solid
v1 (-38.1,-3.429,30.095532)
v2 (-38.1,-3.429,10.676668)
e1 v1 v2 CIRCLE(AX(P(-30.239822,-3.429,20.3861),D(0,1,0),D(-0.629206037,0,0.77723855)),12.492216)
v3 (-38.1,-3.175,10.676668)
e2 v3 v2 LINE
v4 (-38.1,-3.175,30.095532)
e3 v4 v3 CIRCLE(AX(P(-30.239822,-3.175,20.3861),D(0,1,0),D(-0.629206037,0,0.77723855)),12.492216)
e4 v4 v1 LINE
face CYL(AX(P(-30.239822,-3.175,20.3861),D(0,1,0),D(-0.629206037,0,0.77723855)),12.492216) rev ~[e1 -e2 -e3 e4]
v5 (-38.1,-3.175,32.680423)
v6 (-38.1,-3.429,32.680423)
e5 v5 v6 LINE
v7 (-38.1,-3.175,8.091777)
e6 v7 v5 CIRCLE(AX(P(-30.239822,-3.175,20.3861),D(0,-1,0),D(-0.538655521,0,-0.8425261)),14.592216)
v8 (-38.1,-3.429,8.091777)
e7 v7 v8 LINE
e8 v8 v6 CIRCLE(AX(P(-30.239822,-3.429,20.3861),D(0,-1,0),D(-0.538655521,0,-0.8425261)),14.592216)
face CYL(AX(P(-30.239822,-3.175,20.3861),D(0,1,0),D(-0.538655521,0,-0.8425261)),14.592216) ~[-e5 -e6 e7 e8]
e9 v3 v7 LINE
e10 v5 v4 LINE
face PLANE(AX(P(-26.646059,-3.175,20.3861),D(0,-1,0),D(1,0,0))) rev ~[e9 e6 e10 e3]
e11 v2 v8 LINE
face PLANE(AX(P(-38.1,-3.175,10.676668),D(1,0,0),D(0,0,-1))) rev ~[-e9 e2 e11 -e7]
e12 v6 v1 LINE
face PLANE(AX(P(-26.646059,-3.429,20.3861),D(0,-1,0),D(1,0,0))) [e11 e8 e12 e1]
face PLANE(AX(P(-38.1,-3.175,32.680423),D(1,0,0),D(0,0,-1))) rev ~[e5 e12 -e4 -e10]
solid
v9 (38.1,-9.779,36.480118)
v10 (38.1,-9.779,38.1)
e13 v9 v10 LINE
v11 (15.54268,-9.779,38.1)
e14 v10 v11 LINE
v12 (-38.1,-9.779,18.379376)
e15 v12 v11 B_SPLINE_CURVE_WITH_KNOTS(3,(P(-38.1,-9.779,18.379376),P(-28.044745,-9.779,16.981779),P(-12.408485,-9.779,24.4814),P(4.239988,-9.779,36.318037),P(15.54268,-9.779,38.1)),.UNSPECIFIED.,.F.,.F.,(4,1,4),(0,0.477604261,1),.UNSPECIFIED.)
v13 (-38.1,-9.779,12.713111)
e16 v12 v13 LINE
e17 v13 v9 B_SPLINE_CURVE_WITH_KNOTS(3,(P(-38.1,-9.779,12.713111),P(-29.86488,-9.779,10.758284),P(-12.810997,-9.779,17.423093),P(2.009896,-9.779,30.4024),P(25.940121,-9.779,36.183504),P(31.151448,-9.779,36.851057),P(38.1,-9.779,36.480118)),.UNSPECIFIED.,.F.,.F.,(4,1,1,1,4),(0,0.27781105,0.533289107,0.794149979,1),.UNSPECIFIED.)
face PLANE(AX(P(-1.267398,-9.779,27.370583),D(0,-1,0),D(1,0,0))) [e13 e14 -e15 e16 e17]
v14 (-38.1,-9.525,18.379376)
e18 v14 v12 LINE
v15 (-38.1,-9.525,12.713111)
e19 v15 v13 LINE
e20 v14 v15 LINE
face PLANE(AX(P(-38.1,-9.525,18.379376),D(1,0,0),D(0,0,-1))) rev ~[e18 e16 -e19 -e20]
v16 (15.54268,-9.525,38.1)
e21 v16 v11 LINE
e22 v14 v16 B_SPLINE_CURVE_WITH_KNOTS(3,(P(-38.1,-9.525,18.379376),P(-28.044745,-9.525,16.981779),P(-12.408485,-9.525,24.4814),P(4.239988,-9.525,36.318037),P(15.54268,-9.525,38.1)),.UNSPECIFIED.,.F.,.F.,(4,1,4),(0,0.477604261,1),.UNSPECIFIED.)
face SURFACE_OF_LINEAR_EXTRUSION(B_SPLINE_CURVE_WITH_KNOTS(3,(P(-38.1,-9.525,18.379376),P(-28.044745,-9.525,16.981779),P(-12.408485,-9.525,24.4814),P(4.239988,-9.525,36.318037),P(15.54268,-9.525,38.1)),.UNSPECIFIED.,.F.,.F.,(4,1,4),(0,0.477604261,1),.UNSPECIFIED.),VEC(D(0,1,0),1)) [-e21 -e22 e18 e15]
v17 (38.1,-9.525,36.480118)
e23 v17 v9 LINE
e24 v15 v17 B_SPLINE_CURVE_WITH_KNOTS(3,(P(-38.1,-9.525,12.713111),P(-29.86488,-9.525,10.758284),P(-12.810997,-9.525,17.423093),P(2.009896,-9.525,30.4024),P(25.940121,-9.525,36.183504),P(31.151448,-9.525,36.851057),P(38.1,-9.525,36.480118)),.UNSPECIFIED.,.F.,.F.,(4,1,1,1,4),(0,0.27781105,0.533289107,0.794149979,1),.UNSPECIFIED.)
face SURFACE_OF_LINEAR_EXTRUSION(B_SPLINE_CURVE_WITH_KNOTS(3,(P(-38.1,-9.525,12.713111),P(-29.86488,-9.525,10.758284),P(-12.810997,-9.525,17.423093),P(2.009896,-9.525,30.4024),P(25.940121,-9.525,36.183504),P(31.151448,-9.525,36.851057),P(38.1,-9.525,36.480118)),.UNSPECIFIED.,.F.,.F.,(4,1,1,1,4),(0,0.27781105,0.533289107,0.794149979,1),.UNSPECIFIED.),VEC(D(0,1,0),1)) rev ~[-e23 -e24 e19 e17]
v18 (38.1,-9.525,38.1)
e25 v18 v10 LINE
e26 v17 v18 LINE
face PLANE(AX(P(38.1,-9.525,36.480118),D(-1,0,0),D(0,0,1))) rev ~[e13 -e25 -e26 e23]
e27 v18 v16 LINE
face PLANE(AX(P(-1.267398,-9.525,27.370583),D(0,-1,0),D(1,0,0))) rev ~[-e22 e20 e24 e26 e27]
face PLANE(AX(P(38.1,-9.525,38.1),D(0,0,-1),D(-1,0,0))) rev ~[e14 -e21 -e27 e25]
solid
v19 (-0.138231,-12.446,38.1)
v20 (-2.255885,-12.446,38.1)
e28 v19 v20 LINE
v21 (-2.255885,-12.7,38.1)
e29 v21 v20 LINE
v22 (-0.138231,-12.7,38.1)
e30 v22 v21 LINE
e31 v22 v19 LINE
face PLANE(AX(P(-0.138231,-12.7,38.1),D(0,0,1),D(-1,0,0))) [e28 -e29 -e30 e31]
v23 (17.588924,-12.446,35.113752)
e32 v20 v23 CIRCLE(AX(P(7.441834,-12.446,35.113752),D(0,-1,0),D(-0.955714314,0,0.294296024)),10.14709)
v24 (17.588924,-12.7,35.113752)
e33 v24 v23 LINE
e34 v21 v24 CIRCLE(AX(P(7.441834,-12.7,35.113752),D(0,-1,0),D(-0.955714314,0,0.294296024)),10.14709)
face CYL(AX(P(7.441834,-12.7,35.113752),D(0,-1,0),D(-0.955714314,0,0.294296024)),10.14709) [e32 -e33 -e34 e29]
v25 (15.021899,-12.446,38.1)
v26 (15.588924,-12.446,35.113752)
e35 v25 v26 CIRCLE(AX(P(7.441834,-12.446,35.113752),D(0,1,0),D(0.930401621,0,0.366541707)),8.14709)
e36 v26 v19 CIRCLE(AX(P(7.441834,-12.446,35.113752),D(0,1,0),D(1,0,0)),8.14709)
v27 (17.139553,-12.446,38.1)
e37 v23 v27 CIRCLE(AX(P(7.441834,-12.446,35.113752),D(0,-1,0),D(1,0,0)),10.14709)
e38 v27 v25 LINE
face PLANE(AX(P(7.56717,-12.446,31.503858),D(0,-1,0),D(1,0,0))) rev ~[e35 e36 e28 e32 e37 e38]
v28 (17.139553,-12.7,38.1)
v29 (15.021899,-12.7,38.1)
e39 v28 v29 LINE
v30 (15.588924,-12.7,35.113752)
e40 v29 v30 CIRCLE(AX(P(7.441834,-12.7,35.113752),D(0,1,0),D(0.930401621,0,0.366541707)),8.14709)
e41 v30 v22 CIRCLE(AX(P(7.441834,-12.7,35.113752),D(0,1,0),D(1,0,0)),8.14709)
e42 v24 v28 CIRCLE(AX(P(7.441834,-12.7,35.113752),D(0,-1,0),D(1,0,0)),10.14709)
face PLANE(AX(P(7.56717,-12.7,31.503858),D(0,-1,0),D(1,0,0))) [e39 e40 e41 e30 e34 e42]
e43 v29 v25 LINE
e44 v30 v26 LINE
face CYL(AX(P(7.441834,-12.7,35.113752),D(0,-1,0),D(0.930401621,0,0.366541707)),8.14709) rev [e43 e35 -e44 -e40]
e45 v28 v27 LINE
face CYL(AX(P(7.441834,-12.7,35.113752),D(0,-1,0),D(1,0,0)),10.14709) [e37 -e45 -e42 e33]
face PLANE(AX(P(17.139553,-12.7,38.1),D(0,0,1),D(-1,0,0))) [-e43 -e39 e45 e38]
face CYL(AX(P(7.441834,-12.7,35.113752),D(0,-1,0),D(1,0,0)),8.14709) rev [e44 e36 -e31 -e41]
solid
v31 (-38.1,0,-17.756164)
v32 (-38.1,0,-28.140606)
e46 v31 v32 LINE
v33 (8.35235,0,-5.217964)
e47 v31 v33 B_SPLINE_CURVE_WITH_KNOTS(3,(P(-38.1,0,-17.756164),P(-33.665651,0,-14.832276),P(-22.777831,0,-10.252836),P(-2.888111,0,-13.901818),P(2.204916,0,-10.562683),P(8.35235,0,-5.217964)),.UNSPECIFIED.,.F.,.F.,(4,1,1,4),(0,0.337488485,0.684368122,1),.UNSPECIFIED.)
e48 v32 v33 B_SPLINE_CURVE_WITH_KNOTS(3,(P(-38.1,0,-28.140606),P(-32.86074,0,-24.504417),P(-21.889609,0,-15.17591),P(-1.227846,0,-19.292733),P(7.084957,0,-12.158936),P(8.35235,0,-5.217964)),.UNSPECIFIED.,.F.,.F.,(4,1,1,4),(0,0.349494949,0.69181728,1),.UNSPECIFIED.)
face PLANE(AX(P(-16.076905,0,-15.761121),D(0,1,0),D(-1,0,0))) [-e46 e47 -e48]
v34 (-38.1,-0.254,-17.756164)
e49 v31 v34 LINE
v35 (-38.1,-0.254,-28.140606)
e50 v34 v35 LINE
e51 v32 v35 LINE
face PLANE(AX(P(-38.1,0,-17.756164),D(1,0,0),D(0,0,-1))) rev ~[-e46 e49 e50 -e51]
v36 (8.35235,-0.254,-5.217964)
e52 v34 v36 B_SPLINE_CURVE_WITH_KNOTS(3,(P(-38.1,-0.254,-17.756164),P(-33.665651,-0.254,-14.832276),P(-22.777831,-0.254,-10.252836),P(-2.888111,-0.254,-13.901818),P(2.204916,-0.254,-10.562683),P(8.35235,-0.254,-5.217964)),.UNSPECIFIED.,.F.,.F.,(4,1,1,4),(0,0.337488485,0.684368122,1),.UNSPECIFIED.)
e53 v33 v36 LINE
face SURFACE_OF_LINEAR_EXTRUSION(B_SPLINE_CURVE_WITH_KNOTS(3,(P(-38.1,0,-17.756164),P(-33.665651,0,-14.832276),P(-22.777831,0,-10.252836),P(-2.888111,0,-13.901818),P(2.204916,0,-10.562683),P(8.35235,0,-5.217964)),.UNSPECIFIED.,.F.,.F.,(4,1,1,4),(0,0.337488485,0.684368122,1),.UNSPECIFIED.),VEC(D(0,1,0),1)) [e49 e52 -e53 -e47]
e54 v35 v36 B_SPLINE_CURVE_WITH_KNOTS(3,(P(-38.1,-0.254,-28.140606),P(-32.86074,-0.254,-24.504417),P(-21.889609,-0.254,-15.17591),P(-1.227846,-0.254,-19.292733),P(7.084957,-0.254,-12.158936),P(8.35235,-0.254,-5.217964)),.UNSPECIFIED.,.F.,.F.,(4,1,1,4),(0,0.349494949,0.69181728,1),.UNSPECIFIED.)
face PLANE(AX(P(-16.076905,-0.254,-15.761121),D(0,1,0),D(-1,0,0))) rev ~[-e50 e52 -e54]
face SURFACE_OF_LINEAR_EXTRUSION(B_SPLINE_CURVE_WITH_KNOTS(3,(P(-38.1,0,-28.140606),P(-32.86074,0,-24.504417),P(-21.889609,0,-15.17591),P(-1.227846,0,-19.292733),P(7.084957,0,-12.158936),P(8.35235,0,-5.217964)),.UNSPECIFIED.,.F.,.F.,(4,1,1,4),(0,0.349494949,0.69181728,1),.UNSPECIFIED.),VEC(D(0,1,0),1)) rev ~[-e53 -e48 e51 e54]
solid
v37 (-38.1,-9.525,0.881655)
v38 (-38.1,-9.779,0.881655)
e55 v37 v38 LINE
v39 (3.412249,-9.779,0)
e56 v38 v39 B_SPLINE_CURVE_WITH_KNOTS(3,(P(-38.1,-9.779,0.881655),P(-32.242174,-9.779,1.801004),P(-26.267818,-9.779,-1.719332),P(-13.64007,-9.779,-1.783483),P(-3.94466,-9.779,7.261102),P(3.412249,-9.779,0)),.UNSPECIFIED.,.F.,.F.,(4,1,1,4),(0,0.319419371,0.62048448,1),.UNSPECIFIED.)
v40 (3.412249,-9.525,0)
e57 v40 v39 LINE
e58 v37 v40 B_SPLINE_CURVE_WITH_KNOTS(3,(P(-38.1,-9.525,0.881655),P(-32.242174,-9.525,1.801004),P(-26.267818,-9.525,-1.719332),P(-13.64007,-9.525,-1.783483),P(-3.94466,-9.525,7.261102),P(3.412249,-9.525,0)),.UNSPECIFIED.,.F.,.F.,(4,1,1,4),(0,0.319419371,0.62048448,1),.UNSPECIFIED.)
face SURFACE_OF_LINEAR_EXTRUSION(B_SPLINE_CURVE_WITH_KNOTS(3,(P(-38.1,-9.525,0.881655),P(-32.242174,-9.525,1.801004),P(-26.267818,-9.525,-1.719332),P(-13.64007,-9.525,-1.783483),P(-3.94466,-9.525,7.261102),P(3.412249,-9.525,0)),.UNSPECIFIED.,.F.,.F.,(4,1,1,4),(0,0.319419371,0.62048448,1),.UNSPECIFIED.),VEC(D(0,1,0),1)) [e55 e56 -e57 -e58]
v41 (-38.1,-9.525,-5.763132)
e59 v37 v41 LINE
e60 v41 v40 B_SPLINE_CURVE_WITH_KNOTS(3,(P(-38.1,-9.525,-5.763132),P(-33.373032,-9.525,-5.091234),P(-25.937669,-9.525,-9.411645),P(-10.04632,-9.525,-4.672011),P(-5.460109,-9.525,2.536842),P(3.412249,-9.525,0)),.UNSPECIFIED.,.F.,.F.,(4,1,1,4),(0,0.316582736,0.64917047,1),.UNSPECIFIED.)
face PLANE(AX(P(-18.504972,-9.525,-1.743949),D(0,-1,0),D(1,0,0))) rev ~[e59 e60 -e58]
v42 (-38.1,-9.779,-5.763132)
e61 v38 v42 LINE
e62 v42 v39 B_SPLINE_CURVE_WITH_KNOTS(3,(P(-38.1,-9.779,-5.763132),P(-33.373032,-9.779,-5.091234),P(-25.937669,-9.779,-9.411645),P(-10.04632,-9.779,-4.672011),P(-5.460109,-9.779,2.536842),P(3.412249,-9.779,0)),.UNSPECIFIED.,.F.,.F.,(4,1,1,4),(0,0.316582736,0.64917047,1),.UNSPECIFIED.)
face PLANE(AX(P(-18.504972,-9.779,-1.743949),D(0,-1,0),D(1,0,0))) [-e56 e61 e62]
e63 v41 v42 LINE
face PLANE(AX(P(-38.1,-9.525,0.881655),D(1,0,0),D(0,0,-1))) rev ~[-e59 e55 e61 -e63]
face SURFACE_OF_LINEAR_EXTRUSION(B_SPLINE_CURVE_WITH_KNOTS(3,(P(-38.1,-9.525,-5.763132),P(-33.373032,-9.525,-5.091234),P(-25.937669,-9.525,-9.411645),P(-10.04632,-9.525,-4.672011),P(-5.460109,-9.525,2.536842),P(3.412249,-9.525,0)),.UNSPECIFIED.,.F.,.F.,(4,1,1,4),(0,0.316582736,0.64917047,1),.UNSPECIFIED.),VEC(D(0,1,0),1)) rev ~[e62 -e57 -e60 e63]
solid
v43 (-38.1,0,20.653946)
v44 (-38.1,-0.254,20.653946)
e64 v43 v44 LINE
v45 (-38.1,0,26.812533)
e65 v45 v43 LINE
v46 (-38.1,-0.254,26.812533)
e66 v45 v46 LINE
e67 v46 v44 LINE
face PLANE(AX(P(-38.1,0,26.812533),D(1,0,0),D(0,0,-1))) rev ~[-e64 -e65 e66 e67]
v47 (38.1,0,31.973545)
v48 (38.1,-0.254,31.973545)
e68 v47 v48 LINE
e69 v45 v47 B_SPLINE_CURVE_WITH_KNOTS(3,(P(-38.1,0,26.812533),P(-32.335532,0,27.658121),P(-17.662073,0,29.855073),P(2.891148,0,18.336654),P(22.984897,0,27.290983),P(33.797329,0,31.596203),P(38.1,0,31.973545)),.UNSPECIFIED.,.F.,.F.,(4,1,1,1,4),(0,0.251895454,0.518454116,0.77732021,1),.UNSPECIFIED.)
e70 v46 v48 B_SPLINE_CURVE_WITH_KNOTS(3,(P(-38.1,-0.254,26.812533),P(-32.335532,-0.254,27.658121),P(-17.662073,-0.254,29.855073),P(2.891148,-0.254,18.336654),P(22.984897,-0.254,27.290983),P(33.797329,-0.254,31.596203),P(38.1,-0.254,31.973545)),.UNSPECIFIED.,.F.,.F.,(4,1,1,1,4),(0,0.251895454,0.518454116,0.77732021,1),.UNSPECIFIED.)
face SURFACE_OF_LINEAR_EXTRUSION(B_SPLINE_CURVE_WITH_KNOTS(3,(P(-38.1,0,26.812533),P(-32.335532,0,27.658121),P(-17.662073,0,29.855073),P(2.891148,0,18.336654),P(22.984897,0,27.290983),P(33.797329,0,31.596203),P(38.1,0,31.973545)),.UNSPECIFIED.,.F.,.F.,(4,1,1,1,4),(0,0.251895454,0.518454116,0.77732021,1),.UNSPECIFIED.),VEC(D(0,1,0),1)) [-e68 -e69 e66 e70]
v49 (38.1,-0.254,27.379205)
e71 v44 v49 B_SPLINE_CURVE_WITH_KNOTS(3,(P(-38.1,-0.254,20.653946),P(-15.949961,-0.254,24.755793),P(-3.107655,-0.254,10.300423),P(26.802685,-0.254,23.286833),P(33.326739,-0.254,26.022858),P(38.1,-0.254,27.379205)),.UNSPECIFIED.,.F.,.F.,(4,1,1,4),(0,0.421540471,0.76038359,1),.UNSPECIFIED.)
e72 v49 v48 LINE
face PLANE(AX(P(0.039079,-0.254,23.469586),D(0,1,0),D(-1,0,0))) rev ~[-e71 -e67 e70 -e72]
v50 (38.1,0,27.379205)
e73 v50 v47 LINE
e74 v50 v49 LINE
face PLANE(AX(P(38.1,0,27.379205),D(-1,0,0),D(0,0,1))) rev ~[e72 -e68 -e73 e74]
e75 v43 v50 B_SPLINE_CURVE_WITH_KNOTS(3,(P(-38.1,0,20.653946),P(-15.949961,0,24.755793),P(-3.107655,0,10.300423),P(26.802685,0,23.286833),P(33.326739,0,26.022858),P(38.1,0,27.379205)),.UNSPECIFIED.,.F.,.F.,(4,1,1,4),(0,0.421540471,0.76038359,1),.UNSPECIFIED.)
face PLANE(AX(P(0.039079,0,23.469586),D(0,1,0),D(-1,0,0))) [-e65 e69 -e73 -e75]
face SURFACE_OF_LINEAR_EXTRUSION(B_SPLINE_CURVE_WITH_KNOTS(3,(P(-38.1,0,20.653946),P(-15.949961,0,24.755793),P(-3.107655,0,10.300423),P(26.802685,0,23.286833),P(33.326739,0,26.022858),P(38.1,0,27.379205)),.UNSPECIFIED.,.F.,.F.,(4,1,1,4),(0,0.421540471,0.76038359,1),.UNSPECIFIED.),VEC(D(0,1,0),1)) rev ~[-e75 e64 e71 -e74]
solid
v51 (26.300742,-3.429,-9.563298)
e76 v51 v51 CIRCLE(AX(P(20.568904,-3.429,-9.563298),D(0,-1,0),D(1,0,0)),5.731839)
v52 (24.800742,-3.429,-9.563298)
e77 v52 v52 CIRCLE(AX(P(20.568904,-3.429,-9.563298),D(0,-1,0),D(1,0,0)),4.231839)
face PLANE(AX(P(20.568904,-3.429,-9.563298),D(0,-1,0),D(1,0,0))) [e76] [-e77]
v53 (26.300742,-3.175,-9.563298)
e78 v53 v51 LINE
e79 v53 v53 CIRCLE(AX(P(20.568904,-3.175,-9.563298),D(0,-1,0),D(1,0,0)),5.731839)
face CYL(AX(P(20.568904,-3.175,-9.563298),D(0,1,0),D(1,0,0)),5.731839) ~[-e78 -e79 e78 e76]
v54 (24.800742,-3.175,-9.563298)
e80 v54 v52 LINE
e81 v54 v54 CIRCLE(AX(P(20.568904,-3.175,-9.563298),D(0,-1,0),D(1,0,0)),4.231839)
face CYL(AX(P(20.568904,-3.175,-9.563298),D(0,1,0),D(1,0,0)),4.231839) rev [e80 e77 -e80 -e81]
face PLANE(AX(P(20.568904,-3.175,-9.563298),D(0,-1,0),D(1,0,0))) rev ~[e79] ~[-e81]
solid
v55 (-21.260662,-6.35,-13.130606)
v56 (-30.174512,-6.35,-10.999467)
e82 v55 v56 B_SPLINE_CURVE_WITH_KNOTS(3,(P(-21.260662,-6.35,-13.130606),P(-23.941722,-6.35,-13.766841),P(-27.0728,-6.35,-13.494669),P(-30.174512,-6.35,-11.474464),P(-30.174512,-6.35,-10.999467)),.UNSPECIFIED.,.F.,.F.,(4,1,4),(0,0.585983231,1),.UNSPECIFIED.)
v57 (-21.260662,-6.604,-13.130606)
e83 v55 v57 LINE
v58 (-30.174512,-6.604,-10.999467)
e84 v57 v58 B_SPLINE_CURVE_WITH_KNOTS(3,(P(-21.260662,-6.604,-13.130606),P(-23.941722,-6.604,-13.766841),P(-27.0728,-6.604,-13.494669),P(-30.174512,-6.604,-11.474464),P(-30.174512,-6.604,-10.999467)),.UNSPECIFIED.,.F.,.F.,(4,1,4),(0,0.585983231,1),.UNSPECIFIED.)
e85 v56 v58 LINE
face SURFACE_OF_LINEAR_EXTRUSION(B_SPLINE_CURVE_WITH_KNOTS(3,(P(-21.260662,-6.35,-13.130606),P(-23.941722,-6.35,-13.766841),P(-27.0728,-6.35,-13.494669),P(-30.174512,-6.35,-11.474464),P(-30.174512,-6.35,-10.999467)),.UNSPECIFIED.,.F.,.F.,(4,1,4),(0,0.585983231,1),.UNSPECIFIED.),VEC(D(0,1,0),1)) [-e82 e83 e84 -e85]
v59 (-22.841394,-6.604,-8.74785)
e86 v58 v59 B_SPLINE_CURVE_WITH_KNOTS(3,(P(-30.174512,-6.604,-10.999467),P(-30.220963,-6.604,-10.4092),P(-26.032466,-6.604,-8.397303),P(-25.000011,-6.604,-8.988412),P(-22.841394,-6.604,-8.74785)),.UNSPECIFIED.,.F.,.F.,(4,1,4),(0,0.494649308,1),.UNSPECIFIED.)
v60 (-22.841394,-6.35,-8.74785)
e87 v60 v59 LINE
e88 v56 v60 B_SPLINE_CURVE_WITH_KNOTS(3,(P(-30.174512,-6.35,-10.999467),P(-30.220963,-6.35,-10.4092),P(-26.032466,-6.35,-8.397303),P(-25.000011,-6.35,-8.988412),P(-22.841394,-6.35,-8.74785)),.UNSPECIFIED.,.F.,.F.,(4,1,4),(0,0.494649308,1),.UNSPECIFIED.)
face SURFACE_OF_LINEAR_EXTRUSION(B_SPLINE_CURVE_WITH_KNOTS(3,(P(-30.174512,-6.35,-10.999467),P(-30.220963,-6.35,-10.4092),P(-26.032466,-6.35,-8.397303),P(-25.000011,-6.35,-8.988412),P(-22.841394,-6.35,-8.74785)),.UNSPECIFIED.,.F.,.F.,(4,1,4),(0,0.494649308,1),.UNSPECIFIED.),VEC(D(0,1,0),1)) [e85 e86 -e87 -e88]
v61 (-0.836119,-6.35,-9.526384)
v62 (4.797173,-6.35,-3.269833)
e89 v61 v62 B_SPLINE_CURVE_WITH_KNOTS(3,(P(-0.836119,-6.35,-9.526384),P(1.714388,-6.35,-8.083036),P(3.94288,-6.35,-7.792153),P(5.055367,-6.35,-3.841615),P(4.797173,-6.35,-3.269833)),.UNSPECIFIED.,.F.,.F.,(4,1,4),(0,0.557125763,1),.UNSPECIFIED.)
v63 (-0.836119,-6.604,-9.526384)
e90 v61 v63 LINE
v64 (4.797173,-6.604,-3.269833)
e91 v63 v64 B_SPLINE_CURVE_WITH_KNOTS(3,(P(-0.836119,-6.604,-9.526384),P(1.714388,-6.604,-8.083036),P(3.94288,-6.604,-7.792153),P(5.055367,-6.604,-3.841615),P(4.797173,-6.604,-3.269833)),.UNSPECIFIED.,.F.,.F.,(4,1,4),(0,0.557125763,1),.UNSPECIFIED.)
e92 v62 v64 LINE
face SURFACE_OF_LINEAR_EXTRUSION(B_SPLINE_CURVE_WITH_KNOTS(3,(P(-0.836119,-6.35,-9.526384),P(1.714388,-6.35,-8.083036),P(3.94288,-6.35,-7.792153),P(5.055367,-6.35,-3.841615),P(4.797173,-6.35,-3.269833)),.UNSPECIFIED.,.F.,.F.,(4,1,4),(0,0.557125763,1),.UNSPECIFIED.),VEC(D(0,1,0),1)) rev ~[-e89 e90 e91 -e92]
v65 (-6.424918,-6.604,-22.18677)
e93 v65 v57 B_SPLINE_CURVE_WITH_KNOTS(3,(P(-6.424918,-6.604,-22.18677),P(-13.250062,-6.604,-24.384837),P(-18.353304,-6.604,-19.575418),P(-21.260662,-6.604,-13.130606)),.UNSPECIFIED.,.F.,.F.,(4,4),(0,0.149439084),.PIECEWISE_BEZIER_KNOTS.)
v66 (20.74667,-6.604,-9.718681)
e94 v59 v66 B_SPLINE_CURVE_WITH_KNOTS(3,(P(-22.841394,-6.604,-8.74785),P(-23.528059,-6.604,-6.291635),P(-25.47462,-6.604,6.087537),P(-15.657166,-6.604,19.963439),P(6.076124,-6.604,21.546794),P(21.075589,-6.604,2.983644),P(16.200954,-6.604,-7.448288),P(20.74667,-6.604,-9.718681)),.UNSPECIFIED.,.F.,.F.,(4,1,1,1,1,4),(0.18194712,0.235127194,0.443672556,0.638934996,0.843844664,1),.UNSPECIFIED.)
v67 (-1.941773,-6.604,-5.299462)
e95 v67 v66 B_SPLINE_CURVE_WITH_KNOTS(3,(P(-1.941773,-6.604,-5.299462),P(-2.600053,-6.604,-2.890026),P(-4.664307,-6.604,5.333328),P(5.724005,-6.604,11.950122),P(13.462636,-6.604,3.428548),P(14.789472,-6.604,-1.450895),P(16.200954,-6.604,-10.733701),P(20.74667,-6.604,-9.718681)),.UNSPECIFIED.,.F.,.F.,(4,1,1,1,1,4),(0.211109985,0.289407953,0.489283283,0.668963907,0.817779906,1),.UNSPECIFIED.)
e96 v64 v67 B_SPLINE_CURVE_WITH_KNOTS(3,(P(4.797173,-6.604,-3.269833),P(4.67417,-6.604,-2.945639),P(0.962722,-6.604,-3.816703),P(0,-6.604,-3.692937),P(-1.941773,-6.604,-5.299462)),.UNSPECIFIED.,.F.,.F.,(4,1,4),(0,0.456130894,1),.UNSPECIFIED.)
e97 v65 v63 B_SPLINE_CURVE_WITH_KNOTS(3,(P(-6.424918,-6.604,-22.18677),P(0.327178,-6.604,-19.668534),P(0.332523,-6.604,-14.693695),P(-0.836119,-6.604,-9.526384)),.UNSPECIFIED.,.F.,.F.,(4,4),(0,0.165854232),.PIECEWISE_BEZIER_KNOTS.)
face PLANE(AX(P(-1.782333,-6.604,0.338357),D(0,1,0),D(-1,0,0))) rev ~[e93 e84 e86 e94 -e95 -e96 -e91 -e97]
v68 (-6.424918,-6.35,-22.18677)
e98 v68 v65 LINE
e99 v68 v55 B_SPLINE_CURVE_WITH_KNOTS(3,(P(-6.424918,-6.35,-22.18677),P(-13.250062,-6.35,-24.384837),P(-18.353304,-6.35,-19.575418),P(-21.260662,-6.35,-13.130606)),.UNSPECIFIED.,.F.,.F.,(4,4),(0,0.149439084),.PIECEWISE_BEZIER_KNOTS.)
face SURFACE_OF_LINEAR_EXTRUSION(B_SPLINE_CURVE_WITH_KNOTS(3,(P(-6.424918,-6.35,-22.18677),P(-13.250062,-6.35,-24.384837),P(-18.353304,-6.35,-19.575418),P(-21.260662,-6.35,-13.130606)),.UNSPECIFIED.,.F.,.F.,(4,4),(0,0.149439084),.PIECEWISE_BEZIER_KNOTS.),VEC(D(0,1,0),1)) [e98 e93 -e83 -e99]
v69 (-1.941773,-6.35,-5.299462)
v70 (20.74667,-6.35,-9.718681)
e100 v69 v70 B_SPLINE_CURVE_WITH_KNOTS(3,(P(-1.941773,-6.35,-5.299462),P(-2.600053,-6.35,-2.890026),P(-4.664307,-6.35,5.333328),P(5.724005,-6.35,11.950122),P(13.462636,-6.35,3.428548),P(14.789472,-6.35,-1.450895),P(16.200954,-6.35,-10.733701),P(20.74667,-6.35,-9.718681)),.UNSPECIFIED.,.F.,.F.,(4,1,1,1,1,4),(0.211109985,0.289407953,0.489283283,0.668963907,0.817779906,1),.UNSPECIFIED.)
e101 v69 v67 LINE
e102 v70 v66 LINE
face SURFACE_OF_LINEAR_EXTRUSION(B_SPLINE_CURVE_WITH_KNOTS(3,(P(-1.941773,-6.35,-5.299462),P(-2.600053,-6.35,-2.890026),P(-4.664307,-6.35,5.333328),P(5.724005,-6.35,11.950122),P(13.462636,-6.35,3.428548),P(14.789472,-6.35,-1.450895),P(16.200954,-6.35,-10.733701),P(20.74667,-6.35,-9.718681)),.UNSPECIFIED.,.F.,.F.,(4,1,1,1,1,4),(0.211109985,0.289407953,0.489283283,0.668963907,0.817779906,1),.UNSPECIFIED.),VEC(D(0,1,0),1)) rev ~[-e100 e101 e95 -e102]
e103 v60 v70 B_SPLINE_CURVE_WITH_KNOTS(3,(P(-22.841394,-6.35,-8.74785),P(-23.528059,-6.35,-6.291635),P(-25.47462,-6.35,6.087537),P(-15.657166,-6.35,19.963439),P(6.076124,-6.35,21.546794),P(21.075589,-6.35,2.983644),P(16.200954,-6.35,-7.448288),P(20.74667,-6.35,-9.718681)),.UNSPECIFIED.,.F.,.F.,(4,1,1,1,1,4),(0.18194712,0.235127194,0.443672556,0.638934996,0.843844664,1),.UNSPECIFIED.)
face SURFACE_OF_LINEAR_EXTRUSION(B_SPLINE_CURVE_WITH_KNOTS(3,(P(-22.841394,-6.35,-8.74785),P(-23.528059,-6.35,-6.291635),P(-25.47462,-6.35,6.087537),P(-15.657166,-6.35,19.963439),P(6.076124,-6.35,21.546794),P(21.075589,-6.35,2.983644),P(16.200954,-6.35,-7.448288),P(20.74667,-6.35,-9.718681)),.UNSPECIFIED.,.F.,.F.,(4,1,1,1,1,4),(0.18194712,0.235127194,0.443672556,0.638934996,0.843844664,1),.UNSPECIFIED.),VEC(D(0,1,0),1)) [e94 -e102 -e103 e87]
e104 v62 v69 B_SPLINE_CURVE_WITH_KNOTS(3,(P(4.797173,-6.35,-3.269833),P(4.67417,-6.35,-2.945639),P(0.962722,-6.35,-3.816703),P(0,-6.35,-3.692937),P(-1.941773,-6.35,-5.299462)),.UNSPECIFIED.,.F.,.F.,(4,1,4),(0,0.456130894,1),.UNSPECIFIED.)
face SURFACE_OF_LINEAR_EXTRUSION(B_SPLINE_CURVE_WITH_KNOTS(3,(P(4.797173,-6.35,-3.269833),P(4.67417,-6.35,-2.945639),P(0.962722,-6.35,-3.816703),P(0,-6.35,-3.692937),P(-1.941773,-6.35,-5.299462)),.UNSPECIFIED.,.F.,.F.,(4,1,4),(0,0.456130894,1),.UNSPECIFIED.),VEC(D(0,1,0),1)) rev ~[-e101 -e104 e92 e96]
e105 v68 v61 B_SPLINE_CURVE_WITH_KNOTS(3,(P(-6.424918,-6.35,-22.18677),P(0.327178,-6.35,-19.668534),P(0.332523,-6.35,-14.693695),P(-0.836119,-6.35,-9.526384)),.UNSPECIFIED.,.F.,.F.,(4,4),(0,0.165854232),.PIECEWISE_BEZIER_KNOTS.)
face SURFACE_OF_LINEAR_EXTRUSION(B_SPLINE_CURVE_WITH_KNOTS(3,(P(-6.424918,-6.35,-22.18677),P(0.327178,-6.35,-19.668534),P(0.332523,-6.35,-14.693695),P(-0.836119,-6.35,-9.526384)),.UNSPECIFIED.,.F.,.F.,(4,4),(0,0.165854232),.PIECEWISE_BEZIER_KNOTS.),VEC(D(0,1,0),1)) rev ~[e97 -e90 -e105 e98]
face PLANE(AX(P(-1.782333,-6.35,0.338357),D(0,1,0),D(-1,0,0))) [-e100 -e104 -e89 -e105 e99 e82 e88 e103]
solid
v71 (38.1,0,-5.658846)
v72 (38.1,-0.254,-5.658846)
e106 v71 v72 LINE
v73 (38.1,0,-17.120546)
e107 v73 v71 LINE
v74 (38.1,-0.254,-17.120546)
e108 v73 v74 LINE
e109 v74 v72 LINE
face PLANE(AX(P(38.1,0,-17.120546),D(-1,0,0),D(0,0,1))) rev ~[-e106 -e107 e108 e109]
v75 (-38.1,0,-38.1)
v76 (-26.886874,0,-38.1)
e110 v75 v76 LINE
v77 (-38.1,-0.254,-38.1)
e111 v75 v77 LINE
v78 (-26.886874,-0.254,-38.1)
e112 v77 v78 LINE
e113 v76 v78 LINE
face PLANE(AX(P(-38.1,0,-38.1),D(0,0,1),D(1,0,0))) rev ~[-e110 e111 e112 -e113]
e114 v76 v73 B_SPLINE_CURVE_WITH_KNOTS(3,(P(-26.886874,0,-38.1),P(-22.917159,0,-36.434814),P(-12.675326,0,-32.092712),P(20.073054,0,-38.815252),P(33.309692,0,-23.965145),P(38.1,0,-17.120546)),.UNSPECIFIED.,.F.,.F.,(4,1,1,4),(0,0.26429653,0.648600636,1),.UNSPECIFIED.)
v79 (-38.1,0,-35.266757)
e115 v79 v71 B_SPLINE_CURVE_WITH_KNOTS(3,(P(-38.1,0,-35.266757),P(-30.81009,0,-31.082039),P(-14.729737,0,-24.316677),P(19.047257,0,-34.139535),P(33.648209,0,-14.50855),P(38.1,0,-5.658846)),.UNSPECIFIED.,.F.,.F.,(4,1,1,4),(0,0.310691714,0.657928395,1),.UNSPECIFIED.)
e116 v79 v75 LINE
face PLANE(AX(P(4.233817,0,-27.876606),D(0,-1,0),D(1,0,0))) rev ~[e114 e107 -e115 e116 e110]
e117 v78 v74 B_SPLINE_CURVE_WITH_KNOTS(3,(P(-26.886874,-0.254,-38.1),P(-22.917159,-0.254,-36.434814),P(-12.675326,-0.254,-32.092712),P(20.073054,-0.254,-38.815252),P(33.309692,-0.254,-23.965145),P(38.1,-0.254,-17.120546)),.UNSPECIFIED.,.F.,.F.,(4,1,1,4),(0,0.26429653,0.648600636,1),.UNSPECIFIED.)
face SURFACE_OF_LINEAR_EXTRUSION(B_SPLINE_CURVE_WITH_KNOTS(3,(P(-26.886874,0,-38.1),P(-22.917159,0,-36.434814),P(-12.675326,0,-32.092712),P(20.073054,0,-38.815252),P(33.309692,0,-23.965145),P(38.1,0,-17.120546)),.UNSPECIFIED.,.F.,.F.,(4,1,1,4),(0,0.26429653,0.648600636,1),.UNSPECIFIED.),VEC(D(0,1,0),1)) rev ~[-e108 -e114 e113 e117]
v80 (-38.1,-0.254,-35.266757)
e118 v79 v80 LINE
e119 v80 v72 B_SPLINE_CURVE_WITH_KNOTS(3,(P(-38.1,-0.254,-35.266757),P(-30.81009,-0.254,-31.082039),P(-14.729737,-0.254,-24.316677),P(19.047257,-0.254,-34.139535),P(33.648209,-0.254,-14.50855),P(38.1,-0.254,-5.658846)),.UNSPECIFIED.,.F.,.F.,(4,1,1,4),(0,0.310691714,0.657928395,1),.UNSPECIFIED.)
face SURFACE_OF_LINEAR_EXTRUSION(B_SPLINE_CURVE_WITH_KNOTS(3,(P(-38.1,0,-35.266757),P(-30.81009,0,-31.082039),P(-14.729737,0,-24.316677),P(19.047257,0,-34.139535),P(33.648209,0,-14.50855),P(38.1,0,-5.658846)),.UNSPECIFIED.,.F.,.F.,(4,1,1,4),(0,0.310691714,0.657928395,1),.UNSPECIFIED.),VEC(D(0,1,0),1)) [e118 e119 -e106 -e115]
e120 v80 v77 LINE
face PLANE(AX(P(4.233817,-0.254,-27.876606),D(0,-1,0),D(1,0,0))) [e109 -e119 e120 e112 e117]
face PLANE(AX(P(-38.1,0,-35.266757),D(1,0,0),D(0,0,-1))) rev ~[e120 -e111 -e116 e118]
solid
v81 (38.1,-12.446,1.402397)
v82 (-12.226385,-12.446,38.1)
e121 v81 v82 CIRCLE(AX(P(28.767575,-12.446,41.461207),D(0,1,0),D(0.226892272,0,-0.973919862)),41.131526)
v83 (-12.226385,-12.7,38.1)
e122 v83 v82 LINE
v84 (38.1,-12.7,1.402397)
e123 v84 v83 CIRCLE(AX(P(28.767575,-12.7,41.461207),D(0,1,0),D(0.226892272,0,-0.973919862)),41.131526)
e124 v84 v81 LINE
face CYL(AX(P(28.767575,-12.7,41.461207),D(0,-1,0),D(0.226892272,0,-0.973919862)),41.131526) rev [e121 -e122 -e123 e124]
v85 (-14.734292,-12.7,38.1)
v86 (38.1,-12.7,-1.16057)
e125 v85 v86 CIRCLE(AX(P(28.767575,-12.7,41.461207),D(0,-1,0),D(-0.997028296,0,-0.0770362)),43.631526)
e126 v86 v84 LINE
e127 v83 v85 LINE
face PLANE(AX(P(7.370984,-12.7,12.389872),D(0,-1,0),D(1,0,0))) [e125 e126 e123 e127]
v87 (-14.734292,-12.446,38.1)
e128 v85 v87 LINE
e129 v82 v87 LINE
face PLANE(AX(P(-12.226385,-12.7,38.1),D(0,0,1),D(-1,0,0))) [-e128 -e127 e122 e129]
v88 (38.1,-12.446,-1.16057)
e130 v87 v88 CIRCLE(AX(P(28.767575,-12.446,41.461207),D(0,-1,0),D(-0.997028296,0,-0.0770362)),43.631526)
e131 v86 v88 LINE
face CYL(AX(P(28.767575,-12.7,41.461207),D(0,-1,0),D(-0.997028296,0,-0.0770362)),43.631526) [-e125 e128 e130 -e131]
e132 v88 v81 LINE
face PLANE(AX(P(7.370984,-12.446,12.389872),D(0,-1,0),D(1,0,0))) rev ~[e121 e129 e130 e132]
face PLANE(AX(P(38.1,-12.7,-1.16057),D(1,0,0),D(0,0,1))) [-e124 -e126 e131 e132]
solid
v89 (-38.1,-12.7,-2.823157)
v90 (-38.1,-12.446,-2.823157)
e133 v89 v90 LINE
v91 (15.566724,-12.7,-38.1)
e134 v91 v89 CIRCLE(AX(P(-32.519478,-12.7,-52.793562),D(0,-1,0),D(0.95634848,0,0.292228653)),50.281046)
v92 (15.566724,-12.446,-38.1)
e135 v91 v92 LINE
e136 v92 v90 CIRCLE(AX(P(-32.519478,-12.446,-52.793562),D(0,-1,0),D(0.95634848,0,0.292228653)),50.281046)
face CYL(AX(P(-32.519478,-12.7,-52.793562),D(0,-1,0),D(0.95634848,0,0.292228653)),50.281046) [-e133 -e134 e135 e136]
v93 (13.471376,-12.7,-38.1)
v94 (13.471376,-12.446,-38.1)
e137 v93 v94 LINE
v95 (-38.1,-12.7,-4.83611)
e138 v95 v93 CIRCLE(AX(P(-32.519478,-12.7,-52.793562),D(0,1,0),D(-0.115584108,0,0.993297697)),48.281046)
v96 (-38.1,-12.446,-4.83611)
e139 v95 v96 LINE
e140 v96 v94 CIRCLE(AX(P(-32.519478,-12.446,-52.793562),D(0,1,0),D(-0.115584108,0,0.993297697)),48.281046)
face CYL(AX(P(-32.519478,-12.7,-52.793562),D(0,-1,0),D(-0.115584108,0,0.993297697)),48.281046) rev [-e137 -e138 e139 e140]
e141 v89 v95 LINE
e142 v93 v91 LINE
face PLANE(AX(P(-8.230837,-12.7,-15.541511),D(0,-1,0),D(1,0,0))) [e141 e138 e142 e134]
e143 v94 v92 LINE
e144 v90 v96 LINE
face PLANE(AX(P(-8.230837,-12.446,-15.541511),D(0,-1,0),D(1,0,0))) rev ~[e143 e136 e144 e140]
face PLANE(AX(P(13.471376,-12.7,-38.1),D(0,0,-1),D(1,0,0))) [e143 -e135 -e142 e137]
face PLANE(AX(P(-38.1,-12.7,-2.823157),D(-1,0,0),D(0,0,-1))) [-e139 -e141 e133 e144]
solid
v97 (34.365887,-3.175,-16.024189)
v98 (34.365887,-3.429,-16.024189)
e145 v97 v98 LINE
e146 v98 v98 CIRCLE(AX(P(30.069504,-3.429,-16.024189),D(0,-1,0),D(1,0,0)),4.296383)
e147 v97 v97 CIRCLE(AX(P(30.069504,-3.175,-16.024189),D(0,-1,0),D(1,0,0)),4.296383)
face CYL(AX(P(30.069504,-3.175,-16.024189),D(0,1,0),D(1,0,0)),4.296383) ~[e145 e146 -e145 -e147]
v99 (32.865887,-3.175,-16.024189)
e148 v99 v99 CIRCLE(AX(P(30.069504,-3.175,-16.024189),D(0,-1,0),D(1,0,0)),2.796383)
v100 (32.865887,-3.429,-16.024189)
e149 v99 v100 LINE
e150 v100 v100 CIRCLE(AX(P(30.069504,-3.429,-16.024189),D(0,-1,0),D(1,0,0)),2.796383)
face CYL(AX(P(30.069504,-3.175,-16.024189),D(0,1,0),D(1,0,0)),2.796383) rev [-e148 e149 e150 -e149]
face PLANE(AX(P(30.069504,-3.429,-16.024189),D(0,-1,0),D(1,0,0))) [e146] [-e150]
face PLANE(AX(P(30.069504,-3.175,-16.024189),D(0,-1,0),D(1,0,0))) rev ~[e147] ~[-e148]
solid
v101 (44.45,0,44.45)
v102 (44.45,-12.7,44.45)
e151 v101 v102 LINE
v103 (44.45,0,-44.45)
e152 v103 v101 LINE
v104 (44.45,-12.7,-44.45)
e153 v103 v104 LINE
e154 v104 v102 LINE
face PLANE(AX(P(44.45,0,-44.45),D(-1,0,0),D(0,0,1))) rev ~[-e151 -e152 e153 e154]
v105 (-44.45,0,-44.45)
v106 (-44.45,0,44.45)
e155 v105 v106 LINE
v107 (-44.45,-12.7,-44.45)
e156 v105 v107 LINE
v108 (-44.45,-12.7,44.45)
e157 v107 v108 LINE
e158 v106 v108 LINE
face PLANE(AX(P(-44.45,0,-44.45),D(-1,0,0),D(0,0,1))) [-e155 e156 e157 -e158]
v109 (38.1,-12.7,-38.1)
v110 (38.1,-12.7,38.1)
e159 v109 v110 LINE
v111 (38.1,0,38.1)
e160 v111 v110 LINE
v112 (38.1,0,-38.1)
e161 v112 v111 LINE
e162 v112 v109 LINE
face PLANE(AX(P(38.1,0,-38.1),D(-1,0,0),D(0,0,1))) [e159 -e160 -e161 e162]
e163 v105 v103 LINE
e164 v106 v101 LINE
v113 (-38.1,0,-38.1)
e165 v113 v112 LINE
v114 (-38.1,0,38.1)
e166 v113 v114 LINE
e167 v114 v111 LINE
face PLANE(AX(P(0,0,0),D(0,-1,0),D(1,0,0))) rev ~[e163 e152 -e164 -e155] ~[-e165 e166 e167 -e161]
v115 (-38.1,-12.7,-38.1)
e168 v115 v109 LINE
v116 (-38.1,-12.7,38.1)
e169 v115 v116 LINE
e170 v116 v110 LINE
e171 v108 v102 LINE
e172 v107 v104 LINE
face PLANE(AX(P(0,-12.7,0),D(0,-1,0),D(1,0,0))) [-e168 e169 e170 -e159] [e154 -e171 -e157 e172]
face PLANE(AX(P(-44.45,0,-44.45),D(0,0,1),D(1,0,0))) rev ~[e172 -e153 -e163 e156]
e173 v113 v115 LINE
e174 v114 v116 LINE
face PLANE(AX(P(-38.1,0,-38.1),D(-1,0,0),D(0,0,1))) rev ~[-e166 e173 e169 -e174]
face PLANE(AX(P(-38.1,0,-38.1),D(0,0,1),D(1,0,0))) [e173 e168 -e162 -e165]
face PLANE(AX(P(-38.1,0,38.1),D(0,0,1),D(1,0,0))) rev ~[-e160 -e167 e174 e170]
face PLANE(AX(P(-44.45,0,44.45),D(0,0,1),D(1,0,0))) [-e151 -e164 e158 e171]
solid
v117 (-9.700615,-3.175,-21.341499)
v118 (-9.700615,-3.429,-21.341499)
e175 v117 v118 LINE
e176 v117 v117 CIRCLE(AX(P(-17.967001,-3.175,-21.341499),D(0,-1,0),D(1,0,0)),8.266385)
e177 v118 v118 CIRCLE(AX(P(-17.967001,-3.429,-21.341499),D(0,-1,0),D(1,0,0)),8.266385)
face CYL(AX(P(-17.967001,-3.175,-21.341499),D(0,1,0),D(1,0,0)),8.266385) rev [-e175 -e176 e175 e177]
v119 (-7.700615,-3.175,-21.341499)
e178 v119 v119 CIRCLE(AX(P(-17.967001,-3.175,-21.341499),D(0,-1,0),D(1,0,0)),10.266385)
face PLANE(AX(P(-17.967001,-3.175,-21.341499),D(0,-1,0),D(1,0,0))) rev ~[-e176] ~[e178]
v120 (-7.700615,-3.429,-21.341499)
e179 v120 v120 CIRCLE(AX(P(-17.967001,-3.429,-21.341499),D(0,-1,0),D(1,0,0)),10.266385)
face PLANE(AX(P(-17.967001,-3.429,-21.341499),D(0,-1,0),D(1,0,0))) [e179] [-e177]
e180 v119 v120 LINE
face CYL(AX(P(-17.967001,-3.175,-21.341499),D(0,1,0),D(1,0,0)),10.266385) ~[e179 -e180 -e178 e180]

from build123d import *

# Parameters (mm, degrees)
F5_DEPTH  = 0.254
F6_W      = 88.9
F6_H      = 88.9
F6_W_2    = 76.2
F6_H_2    = 76.2
F7_DEPTH  = 12.7
F9_DEPTH  = 0.254
F8_R      = 5.7318385608
F8_R_2    = 4.2318385608
F8_R_3    = 4.2963833061
F8_R_4    = 2.7963833061
F8_R_5    = 10.2663851109
F8_R_6    = 8.2663851109
F11_DEPTH = 0.254
F13_DEPTH = 0.254
F15_DEPTH = 0.254


# Not quite as in the source:
# - a feature names something its author has since deleted; it is built from what else it names


with BuildPart() as f5:
    # F4 (on Front) → F5 (new body)
    with BuildSketch(Plane.XZ):
        with BuildLine():
            add(Edge.make_bspline(
                [(-38.1, 26.8125329167), (-32.3355323319, 27.6581205685), (-17.6620725027, 29.8550732727), (2.8911484909, 18.3366537215), (22.9848974303, 27.2909829997), (33.7973286493, 31.5962033457), (38.1, 31.9735445082)],
                knots=[0, 0, 0, 0, 0.2518954539, 0.5184541158, 0.7773202102, 1, 1, 1, 1], degree=3))
            Line((-38.1, 26.8125329167), (-38.1, 20.6539463252))
            add(Edge.make_bspline(
                [(-38.1, 20.6539463252), (-15.949960798, 24.7557926923), (-3.1076552532, 10.3004231639), (26.8026853229, 23.2868327058), (33.3267393056, 26.0228582677), (38.1, 27.3792054504)],
                knots=[0, 0, 0, 0, 0.421540471, 0.7603835902, 1, 1, 1, 1], degree=3))
            Line((38.1, 27.3792054504), (38.1, 31.9735445082))
        make_face()
    extrude(amount=F5_DEPTH)


with BuildPart() as f5b:
    # F4 (on Front) → F5, piece 2 (new body)
    with BuildSketch(Plane.XZ):
        with BuildLine():
            add(Edge.make_bspline(
                [(-38.1, -17.7561640739), (-33.6656508987, -14.8322757094), (-22.7778311537, -10.2528361771), (-2.8881114291, -13.9018176467), (2.204916316, -10.5626831297), (8.3523495123, -5.2179642953)],
                knots=[0, 0, 0, 0, 0.3374884851, 0.6843681215, 1, 1, 1, 1], degree=3))
            Line((-38.1, -17.7561640739), (-38.1, -28.1406063586))
            add(Edge.make_bspline(
                [(-38.1, -28.1406063586), (-32.8607403294, -24.5044174905), (-21.8896091488, -15.1759103778), (-1.227845599, -19.2927325329), (7.084956957, -12.1589361673), (8.3523495123, -5.2179642953)],
                knots=[0, 0, 0, 0, 0.3494949495, 0.6918172802, 1, 1, 1, 1], degree=3))
        make_face()
    extrude(amount=F5_DEPTH)


with BuildPart() as f5c:
    # F4 (on Front) → F5, piece 3 (new body)
    with BuildSketch(Plane.XZ):
        with BuildLine():
            Line((38.1, -17.1205457007), (38.1, -5.6588463485))
            add(Edge.make_bspline(
                [(-38.1, -35.2667570114), (-30.8100900765, -31.0820389991), (-14.7297369799, -24.3166769191), (19.0472567138, -34.1395350924), (33.6482086396, -14.5085496873), (38.1, -5.6588463485)],
                knots=[0, 0, 0, 0, 0.3106917137, 0.6579283948, 1, 1, 1, 1], degree=3))
            Line((-38.1, -35.2667570114), (-38.1, -38.1))
            Line((-38.1, -38.1), (-26.8868737349, -38.1))
            add(Edge.make_bspline(
                [(-26.8868737349, -38.1), (-22.9171591335, -36.4348137565), (-12.675325853, -32.0927122207), (20.0730540496, -38.8152516782), (33.3096922237, -23.9651451361), (38.1, -17.1205457007)],
                knots=[0, 0, 0, 0, 0.2642965298, 0.6486006357, 1, 1, 1, 1], degree=3))
        make_face()
    extrude(amount=F5_DEPTH)


with BuildPart() as f7:
    # F6 (on Front) → F7 (new body)
    with BuildSketch(Plane.XZ):
        Rectangle(F6_W, F6_H)
        Rectangle(F6_W_2, F6_H_2, mode=Mode.SUBTRACT)
    extrude(amount=F7_DEPTH)


with BuildPart() as f9:
    # F8 (on offset) → F9 (new body)
    with BuildSketch(Plane.XZ.offset(3.175)):
        with BuildLine():
            ThreePointArc((-38.1, 30.0955315868), (-17.7476064417, 20.3860998154), (-38.1, 10.676668044))
            Line((-38.1, 10.676668044), (-38.1, 8.0917770561))
            ThreePointArc((-38.1, 8.0917770561), (-15.6476064417, 20.3860998154), (-38.1, 32.6804225746))
            Line((-38.1, 32.6804225746), (-38.1, 30.0955315868))
        make_face()
    extrude(amount=F9_DEPTH)


with BuildPart() as f9b:
    # F8 (on offset) → F9, piece 2 (new body)
    with BuildSketch(Plane.XZ.offset(3.175)):
        with Locations((20.5689035356, -9.5632979646)):
            Circle(F8_R)
        with Locations((20.5689035356, -9.5632979646)):
            Circle(F8_R_2, mode=Mode.SUBTRACT)
    extrude(amount=F9_DEPTH)


with BuildPart() as f9c:
    # F8 (on offset) → F9, piece 3 (new body)
    with BuildSketch(Plane.XZ.offset(3.175)):
        with Locations((30.0695039332, -16.0241890699)):
            Circle(F8_R_3)
        with Locations((30.0695039332, -16.0241890699)):
            Circle(F8_R_4, mode=Mode.SUBTRACT)
    extrude(amount=F9_DEPTH)


with BuildPart() as f9d:
    # F8 (on offset) → F9, piece 4 (new body)
    with BuildSketch(Plane.XZ.offset(3.175)):
        with Locations((-17.9670006037, -21.3414989412)):
            Circle(F8_R_5)
        with Locations((-17.9670006037, -21.3414989412)):
            Circle(F8_R_6, mode=Mode.SUBTRACT)
    extrude(amount=F9_DEPTH)


with BuildPart() as f11:
    # F10 (on offset) → F11 (new body)
    with BuildSketch(Plane.XZ.offset(6.35)):
        with BuildLine():
            add(Edge.make_bspline(
                [(-6.4249184562, -22.1867698896), (-13.2500620283, -24.3848370363), (-18.3533044547, -19.5754182602), (-21.2606620079, -13.1306063645)],
                knots=[0, 0, 0, 0, 0.1494390843, 0.1494390843, 0.1494390843, 0.1494390843], degree=3))
            add(Edge.make_bspline(
                [(-6.4249184562, -22.1867698896), (0.3271782297, -19.6685342185), (0.3325228983, -14.6936954977), (-0.8361188761, -9.5263842392)],
                knots=[0, 0, 0, 0, 0.1658542317, 0.1658542317, 0.1658542317, 0.1658542317], degree=3))
            add(Edge.make_bspline(
                [(-0.8361188761, -9.5263842392), (-1.1549998819, -8.1164077627), (-1.5612901733, -6.6921007228), (-1.9417725248, -5.299461569)],
                knots=[0.1658542317, 0.1658542317, 0.1658542317, 0.1658542317, 0.2111099853, 0.2111099853, 0.2111099853, 0.2111099853], degree=3))
            add(Edge.make_bspline(
                [(-1.9417725248, -5.299461569), (-2.6000533519, -2.8900261501), (-4.6643068482, 5.3333283427), (5.7240046601, 11.9501215156), (13.4626363144, 3.4285478854), (14.7894718098, -1.4508946575), (16.2009540257, -10.7337011546), (20.7466702388, -9.7186805831)],
                knots=[0.2111099853, 0.2111099853, 0.2111099853, 0.2111099853, 0.2894079531, 0.4892832827, 0.6689639073, 0.8177799065, 1, 1, 1, 1], degree=3))
            add(Edge.make_bspline(
                [(-22.8413937426, -8.7478500813), (-23.5280594409, -6.2916352301), (-25.474620042, 6.0875369866), (-15.6571661637, 19.9634390542), (6.0761236204, 21.5467939449), (21.0755889091, 2.9836436132), (16.2009540257, -7.4482879276), (20.7466702388, -9.7186805831)],
                knots=[0.18194712, 0.18194712, 0.18194712, 0.18194712, 0.2351271942, 0.4436725558, 0.6389349958, 0.8438446644, 1, 1, 1, 1], degree=3))
            add(Edge.make_bspline(
                [(-21.2606620079, -13.1306063645), (-21.8931102289, -11.7286426421), (-22.4216471861, -10.2492906341), (-22.8413937426, -8.7478500813)],
                knots=[0.1494390843, 0.1494390843, 0.1494390843, 0.1494390843, 0.18194712, 0.18194712, 0.18194712, 0.18194712], degree=3))
        make_face()
        with BuildLine():
            add(Edge.make_bspline(
                [(-21.2606620079, -13.1306063645), (-23.9417216373, -13.766841494), (-27.0728004635, -13.4946693686), (-30.1745115386, -11.4744635518), (-30.1745115386, -10.9994667376)],
                knots=[0, 0, 0, 0, 0.5859832309, 1, 1, 1, 1], degree=3))
            add(Edge.make_bspline(
                [(-21.2606620079, -13.1306063645), (-21.8931102289, -11.7286426421), (-22.4216471861, -10.2492906341), (-22.8413937426, -8.7478500813)],
                knots=[0.1494390843, 0.1494390843, 0.1494390843, 0.1494390843, 0.18194712, 0.18194712, 0.18194712, 0.18194712], degree=3))
            add(Edge.make_bspline(
                [(-30.1745115386, -10.9994667376), (-30.2209632652, -10.4091996117), (-26.0324659486, -8.3973027584), (-25.0000113752, -8.9884115249), (-22.8413937426, -8.7478500813)],
                knots=[0, 0, 0, 0, 0.4946493079, 1, 1, 1, 1], degree=3))
        make_face()
        with BuildLine():
            add(Edge.make_bspline(
                [(-0.8361188761, -9.5263842392), (-1.1549998819, -8.1164077627), (-1.5612901733, -6.6921007228), (-1.9417725248, -5.299461569)],
                knots=[0.1658542317, 0.1658542317, 0.1658542317, 0.1658542317, 0.2111099853, 0.2111099853, 0.2111099853, 0.2111099853], degree=3))
            add(Edge.make_bspline(
                [(-0.8361188761, -9.5263842392), (1.7143883914, -8.0830363373), (3.9428798202, -7.7921529466), (5.0553672899, -3.841615334), (4.7971731499, -3.2698325001)],
                knots=[0, 0, 0, 0, 0.5571257635, 1, 1, 1, 1], degree=3))
            add(Edge.make_bspline(
                [(4.7971731499, -3.2698325001), (4.674169921, -2.9456391243), (0.9627219176, -3.816702895), (0, -3.6929372088), (-1.9417725248, -5.299461569)],
                knots=[0, 0, 0, 0, 0.4561308939, 1, 1, 1, 1], degree=3))
        make_face()
    extrude(amount=F11_DEPTH)


with BuildPart() as f13:
    # F12 (on offset) → F13 (new body)
    with BuildSketch(Plane.XZ.offset(9.525)):
        with BuildLine():
            Line((-38.1, 18.3793762699), (-38.1, 12.7131110057))
            add(Edge.make_bspline(
                [(-38.1, 12.7131110057), (-29.8648801095, 10.7582835795), (-12.8109966325, 17.4230931538), (2.0098964591, 30.4024004286), (25.9401214628, 36.1835043538), (31.1514478474, 36.851057469), (38.1, 36.4801175892)],
                knots=[0, 0, 0, 0, 0.2778110497, 0.5332891067, 0.7941499788, 1, 1, 1, 1], degree=3))
            Line((38.1, 36.4801175892), (38.1, 38.1))
            Line((38.1, 38.1), (15.5426803976, 38.1))
            add(Edge.make_bspline(
                [(-38.1, 18.3793762699), (-28.0447446464, 16.9817789183), (-12.4084848313, 24.4813999515), (4.2399876119, 36.3180371406), (15.5426803976, 38.1)],
                knots=[0, 0, 0, 0, 0.4776042611, 1, 1, 1, 1], degree=3))
        make_face()
    extrude(amount=F13_DEPTH)


with BuildPart() as f13b:
    # F12 (on offset) → F13, piece 2 (new body)
    with BuildSketch(Plane.XZ.offset(9.525)):
        with BuildLine():
            Line((-38.1, 0.8816549089), (-38.1, -5.7631321251))
            add(Edge.make_bspline(
                [(-38.1, -5.7631321251), (-33.37303248, -5.09123389), (-25.9376692324, -9.4116452168), (-10.0463203182, -4.6720105696), (-5.4601094794, 2.5368418346), (3.4122494981, 0)],
                knots=[0, 0, 0, 0, 0.316582736, 0.6491704703, 1, 1, 1, 1], degree=3))
            add(Edge.make_bspline(
                [(-38.1, 0.8816549089), (-32.2421744268, 1.8010044564), (-26.2678178426, -1.7193320409), (-13.6400698168, -1.7834828214), (-3.9446599055, 7.261102178), (3.4122494981, 0)],
                knots=[0, 0, 0, 0, 0.3194193715, 0.6204844796, 1, 1, 1, 1], degree=3))
        make_face()
    extrude(amount=F13_DEPTH)


with BuildPart() as f15:
    # F14 (on offset) → F15 (new body)
    with BuildSketch(Plane.XZ.offset(12.7)):
        with BuildLine():
            ThreePointArc((15.5667238507, -38.1), (-4.9006961689, -10.7770598292), (-38.1, -2.8231572042))
            Line((-38.1, -2.8231572042), (-38.1, -4.8361103178))
            ThreePointArc((-38.1, -4.8361103178), (-6.3494510194, -12.2203064086), (13.4713757063, -38.1))
            Line((13.4713757063, -38.1), (15.5667238507, -38.1))
        make_face()
    extrude(amount=-F15_DEPTH)


with BuildPart() as f15b:
    # F14 (on offset) → F15, piece 2 (new body)
    with BuildSketch(Plane.XZ.offset(12.7)):
        with BuildLine():
            Line((-12.2263851522, 38.1), (-14.7342916499, 38.1))
            ThreePointArc((-14.7342916499, 38.1), (2.7438206234, 6.4401517664), (38.1, -1.1605704824))
            Line((38.1, -1.1605704824), (38.1, 1.4023966748))
            ThreePointArc((38.1, 1.4023966748), (4.5334723431, 8.2270267426), (-12.2263851522, 38.1))
        make_face()
    extrude(amount=-F15_DEPTH)


with BuildPart() as f15c:
    # F14 (on offset) → F15, piece 3 (new body)
    with BuildSketch(Plane.XZ.offset(12.7)):
        with BuildLine():
            Line((-0.1382312425, 38.1), (-2.2558846455, 38.1))
            ThreePointArc((-2.2558846455, 38.1), (5.9318993208, 25.0796339249), (17.5889236284, 35.1137518883))
            ThreePointArc((17.5889236284, 35.1137518883), (17.4759520444, 36.6236866484), (17.1395528075, 38.1))
            Line((17.1395528075, 38.1), (15.0218994045, 38.1))
            ThreePointArc((15.0218994045, 38.1), (15.445912387, 36.6335540345), (15.5889236284, 35.1137518883))
            ThreePointArc((15.5889236284, 35.1137518883), (5.9220319347, 27.1096735822), (-0.1382312425, 38.1))
        make_face()
    extrude(amount=-F15_DEPTH)


solid = Compound([f5.part, f5b.part, f5c.part, f7.part, f9.part, f9b.part, f9c.part, f9d.part, f11.part, f13.part, f13b.part, f15.part, f15b.part, f15c.part])
